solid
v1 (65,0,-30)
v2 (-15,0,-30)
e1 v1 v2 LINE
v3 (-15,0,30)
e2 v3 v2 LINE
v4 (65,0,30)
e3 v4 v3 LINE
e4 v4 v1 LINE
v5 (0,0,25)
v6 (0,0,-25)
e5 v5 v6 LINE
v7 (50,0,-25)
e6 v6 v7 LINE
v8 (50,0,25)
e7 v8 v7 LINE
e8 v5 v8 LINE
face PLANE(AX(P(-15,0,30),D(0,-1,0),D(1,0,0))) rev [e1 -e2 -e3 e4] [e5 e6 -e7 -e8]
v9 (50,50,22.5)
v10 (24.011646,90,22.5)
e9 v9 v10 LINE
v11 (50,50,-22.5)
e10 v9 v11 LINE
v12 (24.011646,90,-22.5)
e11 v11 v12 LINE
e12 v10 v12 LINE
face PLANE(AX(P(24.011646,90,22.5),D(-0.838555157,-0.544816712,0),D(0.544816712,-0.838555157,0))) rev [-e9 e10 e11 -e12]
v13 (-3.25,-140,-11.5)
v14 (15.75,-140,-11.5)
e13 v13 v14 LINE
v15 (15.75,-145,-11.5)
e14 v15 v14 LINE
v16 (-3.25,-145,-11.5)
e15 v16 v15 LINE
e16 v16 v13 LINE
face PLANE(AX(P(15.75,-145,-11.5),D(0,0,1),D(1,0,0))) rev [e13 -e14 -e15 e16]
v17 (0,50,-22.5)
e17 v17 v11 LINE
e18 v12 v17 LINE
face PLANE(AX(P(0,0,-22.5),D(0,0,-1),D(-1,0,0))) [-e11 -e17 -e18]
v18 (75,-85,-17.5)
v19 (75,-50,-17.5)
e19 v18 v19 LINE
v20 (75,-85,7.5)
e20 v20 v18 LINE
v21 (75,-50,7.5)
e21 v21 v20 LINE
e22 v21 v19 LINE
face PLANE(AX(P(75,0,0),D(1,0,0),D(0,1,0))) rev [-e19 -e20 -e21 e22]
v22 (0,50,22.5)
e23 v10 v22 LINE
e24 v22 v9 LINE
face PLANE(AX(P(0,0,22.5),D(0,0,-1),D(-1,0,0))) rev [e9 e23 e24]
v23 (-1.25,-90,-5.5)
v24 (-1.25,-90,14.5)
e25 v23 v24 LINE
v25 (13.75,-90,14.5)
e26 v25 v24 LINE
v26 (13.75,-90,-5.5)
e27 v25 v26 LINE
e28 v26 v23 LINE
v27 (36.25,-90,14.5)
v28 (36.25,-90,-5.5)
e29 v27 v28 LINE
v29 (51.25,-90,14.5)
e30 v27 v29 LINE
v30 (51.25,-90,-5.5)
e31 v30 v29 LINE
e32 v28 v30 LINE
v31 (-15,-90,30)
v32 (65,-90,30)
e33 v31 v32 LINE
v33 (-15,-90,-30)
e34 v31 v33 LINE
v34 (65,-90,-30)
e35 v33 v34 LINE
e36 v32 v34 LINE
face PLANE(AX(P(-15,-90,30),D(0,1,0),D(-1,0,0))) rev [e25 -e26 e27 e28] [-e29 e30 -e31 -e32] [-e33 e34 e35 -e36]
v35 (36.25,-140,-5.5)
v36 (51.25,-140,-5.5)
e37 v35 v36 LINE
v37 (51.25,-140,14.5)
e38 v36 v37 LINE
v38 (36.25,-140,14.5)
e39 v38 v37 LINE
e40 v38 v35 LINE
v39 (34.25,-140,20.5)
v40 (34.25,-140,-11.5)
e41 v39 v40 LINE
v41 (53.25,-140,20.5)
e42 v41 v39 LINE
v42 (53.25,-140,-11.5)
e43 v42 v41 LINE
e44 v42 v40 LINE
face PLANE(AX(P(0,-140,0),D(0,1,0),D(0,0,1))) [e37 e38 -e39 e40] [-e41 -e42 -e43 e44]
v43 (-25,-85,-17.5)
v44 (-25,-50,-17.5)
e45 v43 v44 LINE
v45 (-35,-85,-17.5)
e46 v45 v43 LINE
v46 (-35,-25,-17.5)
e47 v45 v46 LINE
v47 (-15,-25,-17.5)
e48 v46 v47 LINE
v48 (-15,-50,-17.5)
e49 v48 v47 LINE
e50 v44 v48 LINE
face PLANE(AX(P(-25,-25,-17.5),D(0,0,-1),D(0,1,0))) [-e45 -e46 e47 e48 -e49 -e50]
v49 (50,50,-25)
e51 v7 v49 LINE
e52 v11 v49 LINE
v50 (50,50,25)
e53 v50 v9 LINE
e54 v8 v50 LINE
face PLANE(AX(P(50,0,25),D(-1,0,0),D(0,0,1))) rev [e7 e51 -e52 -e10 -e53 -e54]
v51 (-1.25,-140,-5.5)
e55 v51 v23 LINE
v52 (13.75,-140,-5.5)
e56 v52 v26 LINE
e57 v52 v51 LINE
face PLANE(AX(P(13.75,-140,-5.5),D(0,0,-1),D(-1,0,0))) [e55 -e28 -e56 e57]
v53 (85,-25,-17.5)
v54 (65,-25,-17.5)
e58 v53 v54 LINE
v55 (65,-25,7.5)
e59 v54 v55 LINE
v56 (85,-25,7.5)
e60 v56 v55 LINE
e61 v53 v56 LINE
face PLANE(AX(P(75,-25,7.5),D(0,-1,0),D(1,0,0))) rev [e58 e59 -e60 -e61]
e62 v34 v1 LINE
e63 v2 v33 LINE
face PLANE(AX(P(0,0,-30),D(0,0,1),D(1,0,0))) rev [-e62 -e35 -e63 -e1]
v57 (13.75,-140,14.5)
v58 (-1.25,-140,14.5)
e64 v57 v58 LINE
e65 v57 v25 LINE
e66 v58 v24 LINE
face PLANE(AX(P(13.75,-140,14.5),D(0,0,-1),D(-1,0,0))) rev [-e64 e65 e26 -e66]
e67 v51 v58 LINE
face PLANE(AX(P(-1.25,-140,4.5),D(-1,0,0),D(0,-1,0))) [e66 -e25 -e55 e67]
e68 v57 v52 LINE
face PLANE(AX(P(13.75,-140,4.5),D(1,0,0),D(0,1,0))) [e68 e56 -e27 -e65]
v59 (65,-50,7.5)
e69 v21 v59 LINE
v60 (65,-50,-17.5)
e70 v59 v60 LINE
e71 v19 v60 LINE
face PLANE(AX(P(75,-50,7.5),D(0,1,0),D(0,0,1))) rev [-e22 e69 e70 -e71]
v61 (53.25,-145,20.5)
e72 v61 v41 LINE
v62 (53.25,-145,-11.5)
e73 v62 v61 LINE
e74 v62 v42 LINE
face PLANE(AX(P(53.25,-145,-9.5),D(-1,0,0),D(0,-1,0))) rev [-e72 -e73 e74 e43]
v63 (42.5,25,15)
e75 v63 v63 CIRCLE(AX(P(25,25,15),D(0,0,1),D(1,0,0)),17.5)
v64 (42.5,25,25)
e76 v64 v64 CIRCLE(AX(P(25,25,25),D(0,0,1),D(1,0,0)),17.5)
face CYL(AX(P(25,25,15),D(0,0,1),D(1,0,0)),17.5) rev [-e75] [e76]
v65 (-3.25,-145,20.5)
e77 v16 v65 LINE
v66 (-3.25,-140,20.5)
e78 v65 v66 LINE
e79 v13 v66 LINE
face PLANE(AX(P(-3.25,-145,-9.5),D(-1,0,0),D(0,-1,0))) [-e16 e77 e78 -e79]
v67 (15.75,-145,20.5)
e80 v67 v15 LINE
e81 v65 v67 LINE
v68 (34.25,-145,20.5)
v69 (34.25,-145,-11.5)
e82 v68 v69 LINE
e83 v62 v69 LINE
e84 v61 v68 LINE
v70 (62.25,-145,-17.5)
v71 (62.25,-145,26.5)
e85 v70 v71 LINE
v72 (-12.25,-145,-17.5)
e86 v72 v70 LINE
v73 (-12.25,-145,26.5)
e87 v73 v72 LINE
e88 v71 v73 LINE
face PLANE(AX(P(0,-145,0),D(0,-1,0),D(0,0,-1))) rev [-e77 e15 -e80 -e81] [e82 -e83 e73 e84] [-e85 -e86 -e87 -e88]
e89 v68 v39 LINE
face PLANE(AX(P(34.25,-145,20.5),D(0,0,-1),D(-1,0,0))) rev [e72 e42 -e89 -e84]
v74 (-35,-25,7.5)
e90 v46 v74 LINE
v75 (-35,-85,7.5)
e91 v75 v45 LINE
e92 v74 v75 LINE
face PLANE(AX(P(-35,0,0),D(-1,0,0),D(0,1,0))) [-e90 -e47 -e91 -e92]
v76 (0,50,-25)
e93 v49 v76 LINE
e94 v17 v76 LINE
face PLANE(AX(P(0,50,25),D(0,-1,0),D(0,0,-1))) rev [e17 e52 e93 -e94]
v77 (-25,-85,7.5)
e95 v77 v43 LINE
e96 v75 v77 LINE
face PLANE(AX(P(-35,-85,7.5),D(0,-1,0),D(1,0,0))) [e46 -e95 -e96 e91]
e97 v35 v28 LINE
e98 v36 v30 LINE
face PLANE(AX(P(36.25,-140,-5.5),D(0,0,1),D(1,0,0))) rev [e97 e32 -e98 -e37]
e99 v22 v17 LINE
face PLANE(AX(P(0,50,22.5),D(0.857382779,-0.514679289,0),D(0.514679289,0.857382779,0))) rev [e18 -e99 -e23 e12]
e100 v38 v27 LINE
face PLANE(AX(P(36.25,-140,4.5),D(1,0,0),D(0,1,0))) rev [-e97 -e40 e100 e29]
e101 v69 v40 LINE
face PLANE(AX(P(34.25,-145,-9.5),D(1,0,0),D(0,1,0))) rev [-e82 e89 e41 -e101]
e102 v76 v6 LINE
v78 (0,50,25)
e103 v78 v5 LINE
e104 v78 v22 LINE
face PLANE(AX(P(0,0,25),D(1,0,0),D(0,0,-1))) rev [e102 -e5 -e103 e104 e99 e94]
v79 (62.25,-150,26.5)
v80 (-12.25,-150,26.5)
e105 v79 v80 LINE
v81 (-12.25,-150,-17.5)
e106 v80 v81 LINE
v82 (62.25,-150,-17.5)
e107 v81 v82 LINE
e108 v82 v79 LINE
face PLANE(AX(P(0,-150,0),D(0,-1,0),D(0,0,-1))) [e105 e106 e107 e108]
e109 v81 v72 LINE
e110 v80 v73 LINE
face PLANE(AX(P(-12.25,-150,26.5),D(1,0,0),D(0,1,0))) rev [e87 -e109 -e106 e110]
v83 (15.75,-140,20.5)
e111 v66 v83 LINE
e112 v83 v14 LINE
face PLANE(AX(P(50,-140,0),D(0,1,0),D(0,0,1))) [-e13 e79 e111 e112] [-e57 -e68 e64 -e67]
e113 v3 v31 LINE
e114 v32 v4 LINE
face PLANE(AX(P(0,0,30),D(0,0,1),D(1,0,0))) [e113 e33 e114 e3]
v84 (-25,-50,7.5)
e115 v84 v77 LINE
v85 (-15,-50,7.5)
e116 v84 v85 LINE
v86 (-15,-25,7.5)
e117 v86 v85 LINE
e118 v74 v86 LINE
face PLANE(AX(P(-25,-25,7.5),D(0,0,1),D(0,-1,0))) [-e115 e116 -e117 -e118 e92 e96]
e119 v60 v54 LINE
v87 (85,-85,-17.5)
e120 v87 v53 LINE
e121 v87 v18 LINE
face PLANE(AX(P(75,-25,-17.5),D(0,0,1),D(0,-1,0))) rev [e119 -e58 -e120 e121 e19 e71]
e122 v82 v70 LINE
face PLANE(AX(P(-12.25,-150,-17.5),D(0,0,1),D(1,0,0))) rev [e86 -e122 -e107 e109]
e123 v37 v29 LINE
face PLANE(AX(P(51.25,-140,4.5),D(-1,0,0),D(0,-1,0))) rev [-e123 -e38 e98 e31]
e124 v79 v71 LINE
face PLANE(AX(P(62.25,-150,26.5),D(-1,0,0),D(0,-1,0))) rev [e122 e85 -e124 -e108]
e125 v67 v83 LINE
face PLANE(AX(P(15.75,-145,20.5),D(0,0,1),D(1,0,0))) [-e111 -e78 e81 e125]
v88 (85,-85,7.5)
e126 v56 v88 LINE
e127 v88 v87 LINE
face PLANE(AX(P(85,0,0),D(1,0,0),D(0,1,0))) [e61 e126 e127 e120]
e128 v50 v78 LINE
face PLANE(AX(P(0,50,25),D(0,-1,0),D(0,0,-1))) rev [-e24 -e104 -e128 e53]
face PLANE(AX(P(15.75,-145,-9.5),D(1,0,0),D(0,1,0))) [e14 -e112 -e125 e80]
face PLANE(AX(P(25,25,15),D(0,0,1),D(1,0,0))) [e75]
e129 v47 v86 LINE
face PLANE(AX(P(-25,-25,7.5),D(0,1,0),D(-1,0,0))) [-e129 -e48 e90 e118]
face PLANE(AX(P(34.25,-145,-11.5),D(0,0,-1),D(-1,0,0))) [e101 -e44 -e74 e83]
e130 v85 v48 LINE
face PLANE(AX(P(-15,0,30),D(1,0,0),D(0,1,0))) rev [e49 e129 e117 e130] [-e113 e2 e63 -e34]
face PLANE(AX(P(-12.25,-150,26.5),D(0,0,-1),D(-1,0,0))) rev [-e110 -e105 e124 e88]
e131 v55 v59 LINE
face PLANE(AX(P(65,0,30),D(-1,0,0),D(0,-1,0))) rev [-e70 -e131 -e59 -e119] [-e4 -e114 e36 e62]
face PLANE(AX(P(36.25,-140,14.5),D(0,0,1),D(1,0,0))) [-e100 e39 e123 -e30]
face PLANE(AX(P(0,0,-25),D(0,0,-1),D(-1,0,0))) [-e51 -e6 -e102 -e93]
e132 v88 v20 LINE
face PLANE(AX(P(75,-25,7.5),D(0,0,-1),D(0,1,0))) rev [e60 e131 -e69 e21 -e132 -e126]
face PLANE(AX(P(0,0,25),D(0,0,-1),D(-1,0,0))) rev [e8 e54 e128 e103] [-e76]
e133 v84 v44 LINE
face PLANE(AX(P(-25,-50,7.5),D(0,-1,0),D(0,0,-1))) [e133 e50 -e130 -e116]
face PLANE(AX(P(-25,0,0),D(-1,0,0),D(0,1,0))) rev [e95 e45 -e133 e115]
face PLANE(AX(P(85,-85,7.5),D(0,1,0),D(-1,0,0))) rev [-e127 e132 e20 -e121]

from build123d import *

# Parameters (mm, degrees)
SKETCH1_W             = 50
SKETCH1_H             = 50
BOSS_EXTRUDE1_DEPTH   = 25
BOSS_EXTRUDE2_DEPTH   = 22.5
SKETCH4_W             = 80
SKETCH4_H             = 90
BOSS_EXTRUDE4_DEPTH   = 30
SKETCH5_W             = 25
SKETCH5_H             = 25
BOSS_EXTRUDE5_DEPTH   = 10
SKETCH6_W             = 25
SKETCH6_H             = 60
BOSS_EXTRUDE6_DEPTH   = 10
SKETCH7_W             = 15
SKETCH7_H             = 10
BOSS_EXTRUDE7_DEPTH   = 50
SKETCH8_W             = 19
SKETCH8_H             = 30
BOSS_EXTRUDE10_DEPTH  = 5
MIRROR3_START         = -1.25
MIRROR3_DEPTH         = 15
MIRROR3_START_2       = 36.25
MIRROR3_2_OUTLINE_W   = 5
MIRROR3_2_OUTLINE_H   = 2
MIRROR3_2_OUTLINE_W_2 = 50
MIRROR3_2_OUTLINE_H_2 = 10
MIRROR3_2_DEPTH       = 15
MIRROR3_START_3       = -3.25
MIRROR3_3_OUTLINE_W   = 5
MIRROR3_3_OUTLINE_H   = 32
MIRROR3_3_DEPTH       = 19
MIRROR3_START_4       = 34.25
MIRROR3_4_OUTLINE_W   = 5
MIRROR3_4_OUTLINE_H   = 2
MIRROR3_4_DEPTH       = 19
SKETCH9_W             = 74.5
SKETCH9_H             = 44
BOSS_EXTRUDE11_DEPTH  = 5
SKETCH10_R            = 17.5
CUT_EXTRUDE1_DEPTH    = 10


# Read off the part's stored shape, not the designer's step: Mirror3
with BuildPart() as part:
    # Sketch1 → Boss-Extrude1 (new, symmetric)
    with BuildSketch(Plane.XY):
        with Locations((25, 25)):
            Rectangle(SKETCH1_W, SKETCH1_H)
    extrude(amount=BOSS_EXTRUDE1_DEPTH, both=True)

    # Sketch2 → Boss-Extrude2 (add, symmetric)
    with BuildSketch(Plane.XY):
        Polygon((0, 50), (24.011645754, 90), (50, 50), align=None)
    extrude(amount=BOSS_EXTRUDE2_DEPTH, both=True)

    # Sketch4 → Boss-Extrude4 (add, symmetric)
    with BuildSketch(Plane.XY):
        with Locations((25, -45)):
            Rectangle(SKETCH4_W, SKETCH4_H)
    extrude(amount=BOSS_EXTRUDE4_DEPTH, both=True)

    # Sketch5 → Boss-Extrude5 (add)
    with BuildSketch(Plane(origin=(65, 0, 0), x_dir=(0, 0, -1), z_dir=(1, 0, 0))):
        with Locations((5, -37.5)):
            Rectangle(SKETCH5_W, SKETCH5_H)
    boss_extrude5 = extrude(amount=BOSS_EXTRUDE5_DEPTH)

    # Sketch6 → Boss-Extrude6 (add)
    with BuildSketch(Plane(origin=(75, 0, 0), x_dir=(0, 0, -1), z_dir=(1, 0, 0))):
        with Locations((5, -55)):
            Rectangle(SKETCH6_W, SKETCH6_H)
    boss_extrude6 = extrude(amount=BOSS_EXTRUDE6_DEPTH)

    # Mirror1: Boss-Extrude5, Boss-Extrude6 across plane
    add(boss_extrude5.mirror(Plane(origin=(25, 0, 0), x_dir=(0, 0, 1), z_dir=(1, 0, 0))))
    add(boss_extrude6.mirror(Plane(origin=(25, 0, 0), x_dir=(0, 0, 1), z_dir=(1, 0, 0))))

    # Sketch7 → Boss-Extrude7 (add)
    with BuildSketch(Plane.XZ.offset(90)):
        with Locations((43.75, -0.5)):
            Rectangle(SKETCH7_W, SKETCH7_H)
    extrude(amount=BOSS_EXTRUDE7_DEPTH)

    # Sketch8 → Boss-Extrude10 (add)
    with BuildSketch(Plane.XZ.offset(140)):
        with Locations((43.75, 5.5)):
            Rectangle(SKETCH8_W, SKETCH8_H)
    extrude(amount=BOSS_EXTRUDE10_DEPTH)

    # Mirror3 outline → Mirror3 (add)
    with BuildSketch(Plane.YZ.offset(MIRROR3_START)):
        Polygon((-90, -5.5), (-90, 14.5), (-140, 14.5), (-140, 20.5), (-145, 20.5), (-145, -11.5), (-140, -11.5), (-140, -5.5), align=None)
    extrude(amount=MIRROR3_DEPTH)

    # Mirror3 2 outline → Mirror3 2 (add)
    with BuildSketch(Plane.YZ.offset(MIRROR3_START_2)):
        with Locations((-142.5, -10.5)):
            Rectangle(MIRROR3_2_OUTLINE_W, MIRROR3_2_OUTLINE_H)
        with Locations((-115, 9.5)):
            Rectangle(MIRROR3_2_OUTLINE_W_2, MIRROR3_2_OUTLINE_H_2)
    extrude(amount=MIRROR3_2_DEPTH)

    # Mirror3 3 outline → Mirror3 3 (add)
    with BuildSketch(Plane.YZ.offset(MIRROR3_START_3)):
        with Locations((-142.5, 4.5)):
            Rectangle(MIRROR3_3_OUTLINE_W, MIRROR3_3_OUTLINE_H)
    extrude(amount=MIRROR3_3_DEPTH)

    # Mirror3 4 outline → Mirror3 4 (add)
    with BuildSketch(Plane.YZ.offset(MIRROR3_START_4)):
        with Locations((-142.5, -10.5)):
            Rectangle(MIRROR3_4_OUTLINE_W, MIRROR3_4_OUTLINE_H)
    extrude(amount=MIRROR3_4_DEPTH)

    # Sketch9 → Boss-Extrude11 (add)
    with BuildSketch(Plane.XZ.offset(145)):
        with Locations((25, 4.5)):
            Rectangle(SKETCH9_W, SKETCH9_H)
    extrude(amount=BOSS_EXTRUDE11_DEPTH)

    # Sketch10 → Cut-Extrude1 (cut)
    with BuildSketch(Plane.XY.offset(25)):
        with Locations((25, 25)):
            Circle(SKETCH10_R)
    extrude(amount=-CUT_EXTRUDE1_DEPTH, mode=Mode.SUBTRACT)


solid = part.part
